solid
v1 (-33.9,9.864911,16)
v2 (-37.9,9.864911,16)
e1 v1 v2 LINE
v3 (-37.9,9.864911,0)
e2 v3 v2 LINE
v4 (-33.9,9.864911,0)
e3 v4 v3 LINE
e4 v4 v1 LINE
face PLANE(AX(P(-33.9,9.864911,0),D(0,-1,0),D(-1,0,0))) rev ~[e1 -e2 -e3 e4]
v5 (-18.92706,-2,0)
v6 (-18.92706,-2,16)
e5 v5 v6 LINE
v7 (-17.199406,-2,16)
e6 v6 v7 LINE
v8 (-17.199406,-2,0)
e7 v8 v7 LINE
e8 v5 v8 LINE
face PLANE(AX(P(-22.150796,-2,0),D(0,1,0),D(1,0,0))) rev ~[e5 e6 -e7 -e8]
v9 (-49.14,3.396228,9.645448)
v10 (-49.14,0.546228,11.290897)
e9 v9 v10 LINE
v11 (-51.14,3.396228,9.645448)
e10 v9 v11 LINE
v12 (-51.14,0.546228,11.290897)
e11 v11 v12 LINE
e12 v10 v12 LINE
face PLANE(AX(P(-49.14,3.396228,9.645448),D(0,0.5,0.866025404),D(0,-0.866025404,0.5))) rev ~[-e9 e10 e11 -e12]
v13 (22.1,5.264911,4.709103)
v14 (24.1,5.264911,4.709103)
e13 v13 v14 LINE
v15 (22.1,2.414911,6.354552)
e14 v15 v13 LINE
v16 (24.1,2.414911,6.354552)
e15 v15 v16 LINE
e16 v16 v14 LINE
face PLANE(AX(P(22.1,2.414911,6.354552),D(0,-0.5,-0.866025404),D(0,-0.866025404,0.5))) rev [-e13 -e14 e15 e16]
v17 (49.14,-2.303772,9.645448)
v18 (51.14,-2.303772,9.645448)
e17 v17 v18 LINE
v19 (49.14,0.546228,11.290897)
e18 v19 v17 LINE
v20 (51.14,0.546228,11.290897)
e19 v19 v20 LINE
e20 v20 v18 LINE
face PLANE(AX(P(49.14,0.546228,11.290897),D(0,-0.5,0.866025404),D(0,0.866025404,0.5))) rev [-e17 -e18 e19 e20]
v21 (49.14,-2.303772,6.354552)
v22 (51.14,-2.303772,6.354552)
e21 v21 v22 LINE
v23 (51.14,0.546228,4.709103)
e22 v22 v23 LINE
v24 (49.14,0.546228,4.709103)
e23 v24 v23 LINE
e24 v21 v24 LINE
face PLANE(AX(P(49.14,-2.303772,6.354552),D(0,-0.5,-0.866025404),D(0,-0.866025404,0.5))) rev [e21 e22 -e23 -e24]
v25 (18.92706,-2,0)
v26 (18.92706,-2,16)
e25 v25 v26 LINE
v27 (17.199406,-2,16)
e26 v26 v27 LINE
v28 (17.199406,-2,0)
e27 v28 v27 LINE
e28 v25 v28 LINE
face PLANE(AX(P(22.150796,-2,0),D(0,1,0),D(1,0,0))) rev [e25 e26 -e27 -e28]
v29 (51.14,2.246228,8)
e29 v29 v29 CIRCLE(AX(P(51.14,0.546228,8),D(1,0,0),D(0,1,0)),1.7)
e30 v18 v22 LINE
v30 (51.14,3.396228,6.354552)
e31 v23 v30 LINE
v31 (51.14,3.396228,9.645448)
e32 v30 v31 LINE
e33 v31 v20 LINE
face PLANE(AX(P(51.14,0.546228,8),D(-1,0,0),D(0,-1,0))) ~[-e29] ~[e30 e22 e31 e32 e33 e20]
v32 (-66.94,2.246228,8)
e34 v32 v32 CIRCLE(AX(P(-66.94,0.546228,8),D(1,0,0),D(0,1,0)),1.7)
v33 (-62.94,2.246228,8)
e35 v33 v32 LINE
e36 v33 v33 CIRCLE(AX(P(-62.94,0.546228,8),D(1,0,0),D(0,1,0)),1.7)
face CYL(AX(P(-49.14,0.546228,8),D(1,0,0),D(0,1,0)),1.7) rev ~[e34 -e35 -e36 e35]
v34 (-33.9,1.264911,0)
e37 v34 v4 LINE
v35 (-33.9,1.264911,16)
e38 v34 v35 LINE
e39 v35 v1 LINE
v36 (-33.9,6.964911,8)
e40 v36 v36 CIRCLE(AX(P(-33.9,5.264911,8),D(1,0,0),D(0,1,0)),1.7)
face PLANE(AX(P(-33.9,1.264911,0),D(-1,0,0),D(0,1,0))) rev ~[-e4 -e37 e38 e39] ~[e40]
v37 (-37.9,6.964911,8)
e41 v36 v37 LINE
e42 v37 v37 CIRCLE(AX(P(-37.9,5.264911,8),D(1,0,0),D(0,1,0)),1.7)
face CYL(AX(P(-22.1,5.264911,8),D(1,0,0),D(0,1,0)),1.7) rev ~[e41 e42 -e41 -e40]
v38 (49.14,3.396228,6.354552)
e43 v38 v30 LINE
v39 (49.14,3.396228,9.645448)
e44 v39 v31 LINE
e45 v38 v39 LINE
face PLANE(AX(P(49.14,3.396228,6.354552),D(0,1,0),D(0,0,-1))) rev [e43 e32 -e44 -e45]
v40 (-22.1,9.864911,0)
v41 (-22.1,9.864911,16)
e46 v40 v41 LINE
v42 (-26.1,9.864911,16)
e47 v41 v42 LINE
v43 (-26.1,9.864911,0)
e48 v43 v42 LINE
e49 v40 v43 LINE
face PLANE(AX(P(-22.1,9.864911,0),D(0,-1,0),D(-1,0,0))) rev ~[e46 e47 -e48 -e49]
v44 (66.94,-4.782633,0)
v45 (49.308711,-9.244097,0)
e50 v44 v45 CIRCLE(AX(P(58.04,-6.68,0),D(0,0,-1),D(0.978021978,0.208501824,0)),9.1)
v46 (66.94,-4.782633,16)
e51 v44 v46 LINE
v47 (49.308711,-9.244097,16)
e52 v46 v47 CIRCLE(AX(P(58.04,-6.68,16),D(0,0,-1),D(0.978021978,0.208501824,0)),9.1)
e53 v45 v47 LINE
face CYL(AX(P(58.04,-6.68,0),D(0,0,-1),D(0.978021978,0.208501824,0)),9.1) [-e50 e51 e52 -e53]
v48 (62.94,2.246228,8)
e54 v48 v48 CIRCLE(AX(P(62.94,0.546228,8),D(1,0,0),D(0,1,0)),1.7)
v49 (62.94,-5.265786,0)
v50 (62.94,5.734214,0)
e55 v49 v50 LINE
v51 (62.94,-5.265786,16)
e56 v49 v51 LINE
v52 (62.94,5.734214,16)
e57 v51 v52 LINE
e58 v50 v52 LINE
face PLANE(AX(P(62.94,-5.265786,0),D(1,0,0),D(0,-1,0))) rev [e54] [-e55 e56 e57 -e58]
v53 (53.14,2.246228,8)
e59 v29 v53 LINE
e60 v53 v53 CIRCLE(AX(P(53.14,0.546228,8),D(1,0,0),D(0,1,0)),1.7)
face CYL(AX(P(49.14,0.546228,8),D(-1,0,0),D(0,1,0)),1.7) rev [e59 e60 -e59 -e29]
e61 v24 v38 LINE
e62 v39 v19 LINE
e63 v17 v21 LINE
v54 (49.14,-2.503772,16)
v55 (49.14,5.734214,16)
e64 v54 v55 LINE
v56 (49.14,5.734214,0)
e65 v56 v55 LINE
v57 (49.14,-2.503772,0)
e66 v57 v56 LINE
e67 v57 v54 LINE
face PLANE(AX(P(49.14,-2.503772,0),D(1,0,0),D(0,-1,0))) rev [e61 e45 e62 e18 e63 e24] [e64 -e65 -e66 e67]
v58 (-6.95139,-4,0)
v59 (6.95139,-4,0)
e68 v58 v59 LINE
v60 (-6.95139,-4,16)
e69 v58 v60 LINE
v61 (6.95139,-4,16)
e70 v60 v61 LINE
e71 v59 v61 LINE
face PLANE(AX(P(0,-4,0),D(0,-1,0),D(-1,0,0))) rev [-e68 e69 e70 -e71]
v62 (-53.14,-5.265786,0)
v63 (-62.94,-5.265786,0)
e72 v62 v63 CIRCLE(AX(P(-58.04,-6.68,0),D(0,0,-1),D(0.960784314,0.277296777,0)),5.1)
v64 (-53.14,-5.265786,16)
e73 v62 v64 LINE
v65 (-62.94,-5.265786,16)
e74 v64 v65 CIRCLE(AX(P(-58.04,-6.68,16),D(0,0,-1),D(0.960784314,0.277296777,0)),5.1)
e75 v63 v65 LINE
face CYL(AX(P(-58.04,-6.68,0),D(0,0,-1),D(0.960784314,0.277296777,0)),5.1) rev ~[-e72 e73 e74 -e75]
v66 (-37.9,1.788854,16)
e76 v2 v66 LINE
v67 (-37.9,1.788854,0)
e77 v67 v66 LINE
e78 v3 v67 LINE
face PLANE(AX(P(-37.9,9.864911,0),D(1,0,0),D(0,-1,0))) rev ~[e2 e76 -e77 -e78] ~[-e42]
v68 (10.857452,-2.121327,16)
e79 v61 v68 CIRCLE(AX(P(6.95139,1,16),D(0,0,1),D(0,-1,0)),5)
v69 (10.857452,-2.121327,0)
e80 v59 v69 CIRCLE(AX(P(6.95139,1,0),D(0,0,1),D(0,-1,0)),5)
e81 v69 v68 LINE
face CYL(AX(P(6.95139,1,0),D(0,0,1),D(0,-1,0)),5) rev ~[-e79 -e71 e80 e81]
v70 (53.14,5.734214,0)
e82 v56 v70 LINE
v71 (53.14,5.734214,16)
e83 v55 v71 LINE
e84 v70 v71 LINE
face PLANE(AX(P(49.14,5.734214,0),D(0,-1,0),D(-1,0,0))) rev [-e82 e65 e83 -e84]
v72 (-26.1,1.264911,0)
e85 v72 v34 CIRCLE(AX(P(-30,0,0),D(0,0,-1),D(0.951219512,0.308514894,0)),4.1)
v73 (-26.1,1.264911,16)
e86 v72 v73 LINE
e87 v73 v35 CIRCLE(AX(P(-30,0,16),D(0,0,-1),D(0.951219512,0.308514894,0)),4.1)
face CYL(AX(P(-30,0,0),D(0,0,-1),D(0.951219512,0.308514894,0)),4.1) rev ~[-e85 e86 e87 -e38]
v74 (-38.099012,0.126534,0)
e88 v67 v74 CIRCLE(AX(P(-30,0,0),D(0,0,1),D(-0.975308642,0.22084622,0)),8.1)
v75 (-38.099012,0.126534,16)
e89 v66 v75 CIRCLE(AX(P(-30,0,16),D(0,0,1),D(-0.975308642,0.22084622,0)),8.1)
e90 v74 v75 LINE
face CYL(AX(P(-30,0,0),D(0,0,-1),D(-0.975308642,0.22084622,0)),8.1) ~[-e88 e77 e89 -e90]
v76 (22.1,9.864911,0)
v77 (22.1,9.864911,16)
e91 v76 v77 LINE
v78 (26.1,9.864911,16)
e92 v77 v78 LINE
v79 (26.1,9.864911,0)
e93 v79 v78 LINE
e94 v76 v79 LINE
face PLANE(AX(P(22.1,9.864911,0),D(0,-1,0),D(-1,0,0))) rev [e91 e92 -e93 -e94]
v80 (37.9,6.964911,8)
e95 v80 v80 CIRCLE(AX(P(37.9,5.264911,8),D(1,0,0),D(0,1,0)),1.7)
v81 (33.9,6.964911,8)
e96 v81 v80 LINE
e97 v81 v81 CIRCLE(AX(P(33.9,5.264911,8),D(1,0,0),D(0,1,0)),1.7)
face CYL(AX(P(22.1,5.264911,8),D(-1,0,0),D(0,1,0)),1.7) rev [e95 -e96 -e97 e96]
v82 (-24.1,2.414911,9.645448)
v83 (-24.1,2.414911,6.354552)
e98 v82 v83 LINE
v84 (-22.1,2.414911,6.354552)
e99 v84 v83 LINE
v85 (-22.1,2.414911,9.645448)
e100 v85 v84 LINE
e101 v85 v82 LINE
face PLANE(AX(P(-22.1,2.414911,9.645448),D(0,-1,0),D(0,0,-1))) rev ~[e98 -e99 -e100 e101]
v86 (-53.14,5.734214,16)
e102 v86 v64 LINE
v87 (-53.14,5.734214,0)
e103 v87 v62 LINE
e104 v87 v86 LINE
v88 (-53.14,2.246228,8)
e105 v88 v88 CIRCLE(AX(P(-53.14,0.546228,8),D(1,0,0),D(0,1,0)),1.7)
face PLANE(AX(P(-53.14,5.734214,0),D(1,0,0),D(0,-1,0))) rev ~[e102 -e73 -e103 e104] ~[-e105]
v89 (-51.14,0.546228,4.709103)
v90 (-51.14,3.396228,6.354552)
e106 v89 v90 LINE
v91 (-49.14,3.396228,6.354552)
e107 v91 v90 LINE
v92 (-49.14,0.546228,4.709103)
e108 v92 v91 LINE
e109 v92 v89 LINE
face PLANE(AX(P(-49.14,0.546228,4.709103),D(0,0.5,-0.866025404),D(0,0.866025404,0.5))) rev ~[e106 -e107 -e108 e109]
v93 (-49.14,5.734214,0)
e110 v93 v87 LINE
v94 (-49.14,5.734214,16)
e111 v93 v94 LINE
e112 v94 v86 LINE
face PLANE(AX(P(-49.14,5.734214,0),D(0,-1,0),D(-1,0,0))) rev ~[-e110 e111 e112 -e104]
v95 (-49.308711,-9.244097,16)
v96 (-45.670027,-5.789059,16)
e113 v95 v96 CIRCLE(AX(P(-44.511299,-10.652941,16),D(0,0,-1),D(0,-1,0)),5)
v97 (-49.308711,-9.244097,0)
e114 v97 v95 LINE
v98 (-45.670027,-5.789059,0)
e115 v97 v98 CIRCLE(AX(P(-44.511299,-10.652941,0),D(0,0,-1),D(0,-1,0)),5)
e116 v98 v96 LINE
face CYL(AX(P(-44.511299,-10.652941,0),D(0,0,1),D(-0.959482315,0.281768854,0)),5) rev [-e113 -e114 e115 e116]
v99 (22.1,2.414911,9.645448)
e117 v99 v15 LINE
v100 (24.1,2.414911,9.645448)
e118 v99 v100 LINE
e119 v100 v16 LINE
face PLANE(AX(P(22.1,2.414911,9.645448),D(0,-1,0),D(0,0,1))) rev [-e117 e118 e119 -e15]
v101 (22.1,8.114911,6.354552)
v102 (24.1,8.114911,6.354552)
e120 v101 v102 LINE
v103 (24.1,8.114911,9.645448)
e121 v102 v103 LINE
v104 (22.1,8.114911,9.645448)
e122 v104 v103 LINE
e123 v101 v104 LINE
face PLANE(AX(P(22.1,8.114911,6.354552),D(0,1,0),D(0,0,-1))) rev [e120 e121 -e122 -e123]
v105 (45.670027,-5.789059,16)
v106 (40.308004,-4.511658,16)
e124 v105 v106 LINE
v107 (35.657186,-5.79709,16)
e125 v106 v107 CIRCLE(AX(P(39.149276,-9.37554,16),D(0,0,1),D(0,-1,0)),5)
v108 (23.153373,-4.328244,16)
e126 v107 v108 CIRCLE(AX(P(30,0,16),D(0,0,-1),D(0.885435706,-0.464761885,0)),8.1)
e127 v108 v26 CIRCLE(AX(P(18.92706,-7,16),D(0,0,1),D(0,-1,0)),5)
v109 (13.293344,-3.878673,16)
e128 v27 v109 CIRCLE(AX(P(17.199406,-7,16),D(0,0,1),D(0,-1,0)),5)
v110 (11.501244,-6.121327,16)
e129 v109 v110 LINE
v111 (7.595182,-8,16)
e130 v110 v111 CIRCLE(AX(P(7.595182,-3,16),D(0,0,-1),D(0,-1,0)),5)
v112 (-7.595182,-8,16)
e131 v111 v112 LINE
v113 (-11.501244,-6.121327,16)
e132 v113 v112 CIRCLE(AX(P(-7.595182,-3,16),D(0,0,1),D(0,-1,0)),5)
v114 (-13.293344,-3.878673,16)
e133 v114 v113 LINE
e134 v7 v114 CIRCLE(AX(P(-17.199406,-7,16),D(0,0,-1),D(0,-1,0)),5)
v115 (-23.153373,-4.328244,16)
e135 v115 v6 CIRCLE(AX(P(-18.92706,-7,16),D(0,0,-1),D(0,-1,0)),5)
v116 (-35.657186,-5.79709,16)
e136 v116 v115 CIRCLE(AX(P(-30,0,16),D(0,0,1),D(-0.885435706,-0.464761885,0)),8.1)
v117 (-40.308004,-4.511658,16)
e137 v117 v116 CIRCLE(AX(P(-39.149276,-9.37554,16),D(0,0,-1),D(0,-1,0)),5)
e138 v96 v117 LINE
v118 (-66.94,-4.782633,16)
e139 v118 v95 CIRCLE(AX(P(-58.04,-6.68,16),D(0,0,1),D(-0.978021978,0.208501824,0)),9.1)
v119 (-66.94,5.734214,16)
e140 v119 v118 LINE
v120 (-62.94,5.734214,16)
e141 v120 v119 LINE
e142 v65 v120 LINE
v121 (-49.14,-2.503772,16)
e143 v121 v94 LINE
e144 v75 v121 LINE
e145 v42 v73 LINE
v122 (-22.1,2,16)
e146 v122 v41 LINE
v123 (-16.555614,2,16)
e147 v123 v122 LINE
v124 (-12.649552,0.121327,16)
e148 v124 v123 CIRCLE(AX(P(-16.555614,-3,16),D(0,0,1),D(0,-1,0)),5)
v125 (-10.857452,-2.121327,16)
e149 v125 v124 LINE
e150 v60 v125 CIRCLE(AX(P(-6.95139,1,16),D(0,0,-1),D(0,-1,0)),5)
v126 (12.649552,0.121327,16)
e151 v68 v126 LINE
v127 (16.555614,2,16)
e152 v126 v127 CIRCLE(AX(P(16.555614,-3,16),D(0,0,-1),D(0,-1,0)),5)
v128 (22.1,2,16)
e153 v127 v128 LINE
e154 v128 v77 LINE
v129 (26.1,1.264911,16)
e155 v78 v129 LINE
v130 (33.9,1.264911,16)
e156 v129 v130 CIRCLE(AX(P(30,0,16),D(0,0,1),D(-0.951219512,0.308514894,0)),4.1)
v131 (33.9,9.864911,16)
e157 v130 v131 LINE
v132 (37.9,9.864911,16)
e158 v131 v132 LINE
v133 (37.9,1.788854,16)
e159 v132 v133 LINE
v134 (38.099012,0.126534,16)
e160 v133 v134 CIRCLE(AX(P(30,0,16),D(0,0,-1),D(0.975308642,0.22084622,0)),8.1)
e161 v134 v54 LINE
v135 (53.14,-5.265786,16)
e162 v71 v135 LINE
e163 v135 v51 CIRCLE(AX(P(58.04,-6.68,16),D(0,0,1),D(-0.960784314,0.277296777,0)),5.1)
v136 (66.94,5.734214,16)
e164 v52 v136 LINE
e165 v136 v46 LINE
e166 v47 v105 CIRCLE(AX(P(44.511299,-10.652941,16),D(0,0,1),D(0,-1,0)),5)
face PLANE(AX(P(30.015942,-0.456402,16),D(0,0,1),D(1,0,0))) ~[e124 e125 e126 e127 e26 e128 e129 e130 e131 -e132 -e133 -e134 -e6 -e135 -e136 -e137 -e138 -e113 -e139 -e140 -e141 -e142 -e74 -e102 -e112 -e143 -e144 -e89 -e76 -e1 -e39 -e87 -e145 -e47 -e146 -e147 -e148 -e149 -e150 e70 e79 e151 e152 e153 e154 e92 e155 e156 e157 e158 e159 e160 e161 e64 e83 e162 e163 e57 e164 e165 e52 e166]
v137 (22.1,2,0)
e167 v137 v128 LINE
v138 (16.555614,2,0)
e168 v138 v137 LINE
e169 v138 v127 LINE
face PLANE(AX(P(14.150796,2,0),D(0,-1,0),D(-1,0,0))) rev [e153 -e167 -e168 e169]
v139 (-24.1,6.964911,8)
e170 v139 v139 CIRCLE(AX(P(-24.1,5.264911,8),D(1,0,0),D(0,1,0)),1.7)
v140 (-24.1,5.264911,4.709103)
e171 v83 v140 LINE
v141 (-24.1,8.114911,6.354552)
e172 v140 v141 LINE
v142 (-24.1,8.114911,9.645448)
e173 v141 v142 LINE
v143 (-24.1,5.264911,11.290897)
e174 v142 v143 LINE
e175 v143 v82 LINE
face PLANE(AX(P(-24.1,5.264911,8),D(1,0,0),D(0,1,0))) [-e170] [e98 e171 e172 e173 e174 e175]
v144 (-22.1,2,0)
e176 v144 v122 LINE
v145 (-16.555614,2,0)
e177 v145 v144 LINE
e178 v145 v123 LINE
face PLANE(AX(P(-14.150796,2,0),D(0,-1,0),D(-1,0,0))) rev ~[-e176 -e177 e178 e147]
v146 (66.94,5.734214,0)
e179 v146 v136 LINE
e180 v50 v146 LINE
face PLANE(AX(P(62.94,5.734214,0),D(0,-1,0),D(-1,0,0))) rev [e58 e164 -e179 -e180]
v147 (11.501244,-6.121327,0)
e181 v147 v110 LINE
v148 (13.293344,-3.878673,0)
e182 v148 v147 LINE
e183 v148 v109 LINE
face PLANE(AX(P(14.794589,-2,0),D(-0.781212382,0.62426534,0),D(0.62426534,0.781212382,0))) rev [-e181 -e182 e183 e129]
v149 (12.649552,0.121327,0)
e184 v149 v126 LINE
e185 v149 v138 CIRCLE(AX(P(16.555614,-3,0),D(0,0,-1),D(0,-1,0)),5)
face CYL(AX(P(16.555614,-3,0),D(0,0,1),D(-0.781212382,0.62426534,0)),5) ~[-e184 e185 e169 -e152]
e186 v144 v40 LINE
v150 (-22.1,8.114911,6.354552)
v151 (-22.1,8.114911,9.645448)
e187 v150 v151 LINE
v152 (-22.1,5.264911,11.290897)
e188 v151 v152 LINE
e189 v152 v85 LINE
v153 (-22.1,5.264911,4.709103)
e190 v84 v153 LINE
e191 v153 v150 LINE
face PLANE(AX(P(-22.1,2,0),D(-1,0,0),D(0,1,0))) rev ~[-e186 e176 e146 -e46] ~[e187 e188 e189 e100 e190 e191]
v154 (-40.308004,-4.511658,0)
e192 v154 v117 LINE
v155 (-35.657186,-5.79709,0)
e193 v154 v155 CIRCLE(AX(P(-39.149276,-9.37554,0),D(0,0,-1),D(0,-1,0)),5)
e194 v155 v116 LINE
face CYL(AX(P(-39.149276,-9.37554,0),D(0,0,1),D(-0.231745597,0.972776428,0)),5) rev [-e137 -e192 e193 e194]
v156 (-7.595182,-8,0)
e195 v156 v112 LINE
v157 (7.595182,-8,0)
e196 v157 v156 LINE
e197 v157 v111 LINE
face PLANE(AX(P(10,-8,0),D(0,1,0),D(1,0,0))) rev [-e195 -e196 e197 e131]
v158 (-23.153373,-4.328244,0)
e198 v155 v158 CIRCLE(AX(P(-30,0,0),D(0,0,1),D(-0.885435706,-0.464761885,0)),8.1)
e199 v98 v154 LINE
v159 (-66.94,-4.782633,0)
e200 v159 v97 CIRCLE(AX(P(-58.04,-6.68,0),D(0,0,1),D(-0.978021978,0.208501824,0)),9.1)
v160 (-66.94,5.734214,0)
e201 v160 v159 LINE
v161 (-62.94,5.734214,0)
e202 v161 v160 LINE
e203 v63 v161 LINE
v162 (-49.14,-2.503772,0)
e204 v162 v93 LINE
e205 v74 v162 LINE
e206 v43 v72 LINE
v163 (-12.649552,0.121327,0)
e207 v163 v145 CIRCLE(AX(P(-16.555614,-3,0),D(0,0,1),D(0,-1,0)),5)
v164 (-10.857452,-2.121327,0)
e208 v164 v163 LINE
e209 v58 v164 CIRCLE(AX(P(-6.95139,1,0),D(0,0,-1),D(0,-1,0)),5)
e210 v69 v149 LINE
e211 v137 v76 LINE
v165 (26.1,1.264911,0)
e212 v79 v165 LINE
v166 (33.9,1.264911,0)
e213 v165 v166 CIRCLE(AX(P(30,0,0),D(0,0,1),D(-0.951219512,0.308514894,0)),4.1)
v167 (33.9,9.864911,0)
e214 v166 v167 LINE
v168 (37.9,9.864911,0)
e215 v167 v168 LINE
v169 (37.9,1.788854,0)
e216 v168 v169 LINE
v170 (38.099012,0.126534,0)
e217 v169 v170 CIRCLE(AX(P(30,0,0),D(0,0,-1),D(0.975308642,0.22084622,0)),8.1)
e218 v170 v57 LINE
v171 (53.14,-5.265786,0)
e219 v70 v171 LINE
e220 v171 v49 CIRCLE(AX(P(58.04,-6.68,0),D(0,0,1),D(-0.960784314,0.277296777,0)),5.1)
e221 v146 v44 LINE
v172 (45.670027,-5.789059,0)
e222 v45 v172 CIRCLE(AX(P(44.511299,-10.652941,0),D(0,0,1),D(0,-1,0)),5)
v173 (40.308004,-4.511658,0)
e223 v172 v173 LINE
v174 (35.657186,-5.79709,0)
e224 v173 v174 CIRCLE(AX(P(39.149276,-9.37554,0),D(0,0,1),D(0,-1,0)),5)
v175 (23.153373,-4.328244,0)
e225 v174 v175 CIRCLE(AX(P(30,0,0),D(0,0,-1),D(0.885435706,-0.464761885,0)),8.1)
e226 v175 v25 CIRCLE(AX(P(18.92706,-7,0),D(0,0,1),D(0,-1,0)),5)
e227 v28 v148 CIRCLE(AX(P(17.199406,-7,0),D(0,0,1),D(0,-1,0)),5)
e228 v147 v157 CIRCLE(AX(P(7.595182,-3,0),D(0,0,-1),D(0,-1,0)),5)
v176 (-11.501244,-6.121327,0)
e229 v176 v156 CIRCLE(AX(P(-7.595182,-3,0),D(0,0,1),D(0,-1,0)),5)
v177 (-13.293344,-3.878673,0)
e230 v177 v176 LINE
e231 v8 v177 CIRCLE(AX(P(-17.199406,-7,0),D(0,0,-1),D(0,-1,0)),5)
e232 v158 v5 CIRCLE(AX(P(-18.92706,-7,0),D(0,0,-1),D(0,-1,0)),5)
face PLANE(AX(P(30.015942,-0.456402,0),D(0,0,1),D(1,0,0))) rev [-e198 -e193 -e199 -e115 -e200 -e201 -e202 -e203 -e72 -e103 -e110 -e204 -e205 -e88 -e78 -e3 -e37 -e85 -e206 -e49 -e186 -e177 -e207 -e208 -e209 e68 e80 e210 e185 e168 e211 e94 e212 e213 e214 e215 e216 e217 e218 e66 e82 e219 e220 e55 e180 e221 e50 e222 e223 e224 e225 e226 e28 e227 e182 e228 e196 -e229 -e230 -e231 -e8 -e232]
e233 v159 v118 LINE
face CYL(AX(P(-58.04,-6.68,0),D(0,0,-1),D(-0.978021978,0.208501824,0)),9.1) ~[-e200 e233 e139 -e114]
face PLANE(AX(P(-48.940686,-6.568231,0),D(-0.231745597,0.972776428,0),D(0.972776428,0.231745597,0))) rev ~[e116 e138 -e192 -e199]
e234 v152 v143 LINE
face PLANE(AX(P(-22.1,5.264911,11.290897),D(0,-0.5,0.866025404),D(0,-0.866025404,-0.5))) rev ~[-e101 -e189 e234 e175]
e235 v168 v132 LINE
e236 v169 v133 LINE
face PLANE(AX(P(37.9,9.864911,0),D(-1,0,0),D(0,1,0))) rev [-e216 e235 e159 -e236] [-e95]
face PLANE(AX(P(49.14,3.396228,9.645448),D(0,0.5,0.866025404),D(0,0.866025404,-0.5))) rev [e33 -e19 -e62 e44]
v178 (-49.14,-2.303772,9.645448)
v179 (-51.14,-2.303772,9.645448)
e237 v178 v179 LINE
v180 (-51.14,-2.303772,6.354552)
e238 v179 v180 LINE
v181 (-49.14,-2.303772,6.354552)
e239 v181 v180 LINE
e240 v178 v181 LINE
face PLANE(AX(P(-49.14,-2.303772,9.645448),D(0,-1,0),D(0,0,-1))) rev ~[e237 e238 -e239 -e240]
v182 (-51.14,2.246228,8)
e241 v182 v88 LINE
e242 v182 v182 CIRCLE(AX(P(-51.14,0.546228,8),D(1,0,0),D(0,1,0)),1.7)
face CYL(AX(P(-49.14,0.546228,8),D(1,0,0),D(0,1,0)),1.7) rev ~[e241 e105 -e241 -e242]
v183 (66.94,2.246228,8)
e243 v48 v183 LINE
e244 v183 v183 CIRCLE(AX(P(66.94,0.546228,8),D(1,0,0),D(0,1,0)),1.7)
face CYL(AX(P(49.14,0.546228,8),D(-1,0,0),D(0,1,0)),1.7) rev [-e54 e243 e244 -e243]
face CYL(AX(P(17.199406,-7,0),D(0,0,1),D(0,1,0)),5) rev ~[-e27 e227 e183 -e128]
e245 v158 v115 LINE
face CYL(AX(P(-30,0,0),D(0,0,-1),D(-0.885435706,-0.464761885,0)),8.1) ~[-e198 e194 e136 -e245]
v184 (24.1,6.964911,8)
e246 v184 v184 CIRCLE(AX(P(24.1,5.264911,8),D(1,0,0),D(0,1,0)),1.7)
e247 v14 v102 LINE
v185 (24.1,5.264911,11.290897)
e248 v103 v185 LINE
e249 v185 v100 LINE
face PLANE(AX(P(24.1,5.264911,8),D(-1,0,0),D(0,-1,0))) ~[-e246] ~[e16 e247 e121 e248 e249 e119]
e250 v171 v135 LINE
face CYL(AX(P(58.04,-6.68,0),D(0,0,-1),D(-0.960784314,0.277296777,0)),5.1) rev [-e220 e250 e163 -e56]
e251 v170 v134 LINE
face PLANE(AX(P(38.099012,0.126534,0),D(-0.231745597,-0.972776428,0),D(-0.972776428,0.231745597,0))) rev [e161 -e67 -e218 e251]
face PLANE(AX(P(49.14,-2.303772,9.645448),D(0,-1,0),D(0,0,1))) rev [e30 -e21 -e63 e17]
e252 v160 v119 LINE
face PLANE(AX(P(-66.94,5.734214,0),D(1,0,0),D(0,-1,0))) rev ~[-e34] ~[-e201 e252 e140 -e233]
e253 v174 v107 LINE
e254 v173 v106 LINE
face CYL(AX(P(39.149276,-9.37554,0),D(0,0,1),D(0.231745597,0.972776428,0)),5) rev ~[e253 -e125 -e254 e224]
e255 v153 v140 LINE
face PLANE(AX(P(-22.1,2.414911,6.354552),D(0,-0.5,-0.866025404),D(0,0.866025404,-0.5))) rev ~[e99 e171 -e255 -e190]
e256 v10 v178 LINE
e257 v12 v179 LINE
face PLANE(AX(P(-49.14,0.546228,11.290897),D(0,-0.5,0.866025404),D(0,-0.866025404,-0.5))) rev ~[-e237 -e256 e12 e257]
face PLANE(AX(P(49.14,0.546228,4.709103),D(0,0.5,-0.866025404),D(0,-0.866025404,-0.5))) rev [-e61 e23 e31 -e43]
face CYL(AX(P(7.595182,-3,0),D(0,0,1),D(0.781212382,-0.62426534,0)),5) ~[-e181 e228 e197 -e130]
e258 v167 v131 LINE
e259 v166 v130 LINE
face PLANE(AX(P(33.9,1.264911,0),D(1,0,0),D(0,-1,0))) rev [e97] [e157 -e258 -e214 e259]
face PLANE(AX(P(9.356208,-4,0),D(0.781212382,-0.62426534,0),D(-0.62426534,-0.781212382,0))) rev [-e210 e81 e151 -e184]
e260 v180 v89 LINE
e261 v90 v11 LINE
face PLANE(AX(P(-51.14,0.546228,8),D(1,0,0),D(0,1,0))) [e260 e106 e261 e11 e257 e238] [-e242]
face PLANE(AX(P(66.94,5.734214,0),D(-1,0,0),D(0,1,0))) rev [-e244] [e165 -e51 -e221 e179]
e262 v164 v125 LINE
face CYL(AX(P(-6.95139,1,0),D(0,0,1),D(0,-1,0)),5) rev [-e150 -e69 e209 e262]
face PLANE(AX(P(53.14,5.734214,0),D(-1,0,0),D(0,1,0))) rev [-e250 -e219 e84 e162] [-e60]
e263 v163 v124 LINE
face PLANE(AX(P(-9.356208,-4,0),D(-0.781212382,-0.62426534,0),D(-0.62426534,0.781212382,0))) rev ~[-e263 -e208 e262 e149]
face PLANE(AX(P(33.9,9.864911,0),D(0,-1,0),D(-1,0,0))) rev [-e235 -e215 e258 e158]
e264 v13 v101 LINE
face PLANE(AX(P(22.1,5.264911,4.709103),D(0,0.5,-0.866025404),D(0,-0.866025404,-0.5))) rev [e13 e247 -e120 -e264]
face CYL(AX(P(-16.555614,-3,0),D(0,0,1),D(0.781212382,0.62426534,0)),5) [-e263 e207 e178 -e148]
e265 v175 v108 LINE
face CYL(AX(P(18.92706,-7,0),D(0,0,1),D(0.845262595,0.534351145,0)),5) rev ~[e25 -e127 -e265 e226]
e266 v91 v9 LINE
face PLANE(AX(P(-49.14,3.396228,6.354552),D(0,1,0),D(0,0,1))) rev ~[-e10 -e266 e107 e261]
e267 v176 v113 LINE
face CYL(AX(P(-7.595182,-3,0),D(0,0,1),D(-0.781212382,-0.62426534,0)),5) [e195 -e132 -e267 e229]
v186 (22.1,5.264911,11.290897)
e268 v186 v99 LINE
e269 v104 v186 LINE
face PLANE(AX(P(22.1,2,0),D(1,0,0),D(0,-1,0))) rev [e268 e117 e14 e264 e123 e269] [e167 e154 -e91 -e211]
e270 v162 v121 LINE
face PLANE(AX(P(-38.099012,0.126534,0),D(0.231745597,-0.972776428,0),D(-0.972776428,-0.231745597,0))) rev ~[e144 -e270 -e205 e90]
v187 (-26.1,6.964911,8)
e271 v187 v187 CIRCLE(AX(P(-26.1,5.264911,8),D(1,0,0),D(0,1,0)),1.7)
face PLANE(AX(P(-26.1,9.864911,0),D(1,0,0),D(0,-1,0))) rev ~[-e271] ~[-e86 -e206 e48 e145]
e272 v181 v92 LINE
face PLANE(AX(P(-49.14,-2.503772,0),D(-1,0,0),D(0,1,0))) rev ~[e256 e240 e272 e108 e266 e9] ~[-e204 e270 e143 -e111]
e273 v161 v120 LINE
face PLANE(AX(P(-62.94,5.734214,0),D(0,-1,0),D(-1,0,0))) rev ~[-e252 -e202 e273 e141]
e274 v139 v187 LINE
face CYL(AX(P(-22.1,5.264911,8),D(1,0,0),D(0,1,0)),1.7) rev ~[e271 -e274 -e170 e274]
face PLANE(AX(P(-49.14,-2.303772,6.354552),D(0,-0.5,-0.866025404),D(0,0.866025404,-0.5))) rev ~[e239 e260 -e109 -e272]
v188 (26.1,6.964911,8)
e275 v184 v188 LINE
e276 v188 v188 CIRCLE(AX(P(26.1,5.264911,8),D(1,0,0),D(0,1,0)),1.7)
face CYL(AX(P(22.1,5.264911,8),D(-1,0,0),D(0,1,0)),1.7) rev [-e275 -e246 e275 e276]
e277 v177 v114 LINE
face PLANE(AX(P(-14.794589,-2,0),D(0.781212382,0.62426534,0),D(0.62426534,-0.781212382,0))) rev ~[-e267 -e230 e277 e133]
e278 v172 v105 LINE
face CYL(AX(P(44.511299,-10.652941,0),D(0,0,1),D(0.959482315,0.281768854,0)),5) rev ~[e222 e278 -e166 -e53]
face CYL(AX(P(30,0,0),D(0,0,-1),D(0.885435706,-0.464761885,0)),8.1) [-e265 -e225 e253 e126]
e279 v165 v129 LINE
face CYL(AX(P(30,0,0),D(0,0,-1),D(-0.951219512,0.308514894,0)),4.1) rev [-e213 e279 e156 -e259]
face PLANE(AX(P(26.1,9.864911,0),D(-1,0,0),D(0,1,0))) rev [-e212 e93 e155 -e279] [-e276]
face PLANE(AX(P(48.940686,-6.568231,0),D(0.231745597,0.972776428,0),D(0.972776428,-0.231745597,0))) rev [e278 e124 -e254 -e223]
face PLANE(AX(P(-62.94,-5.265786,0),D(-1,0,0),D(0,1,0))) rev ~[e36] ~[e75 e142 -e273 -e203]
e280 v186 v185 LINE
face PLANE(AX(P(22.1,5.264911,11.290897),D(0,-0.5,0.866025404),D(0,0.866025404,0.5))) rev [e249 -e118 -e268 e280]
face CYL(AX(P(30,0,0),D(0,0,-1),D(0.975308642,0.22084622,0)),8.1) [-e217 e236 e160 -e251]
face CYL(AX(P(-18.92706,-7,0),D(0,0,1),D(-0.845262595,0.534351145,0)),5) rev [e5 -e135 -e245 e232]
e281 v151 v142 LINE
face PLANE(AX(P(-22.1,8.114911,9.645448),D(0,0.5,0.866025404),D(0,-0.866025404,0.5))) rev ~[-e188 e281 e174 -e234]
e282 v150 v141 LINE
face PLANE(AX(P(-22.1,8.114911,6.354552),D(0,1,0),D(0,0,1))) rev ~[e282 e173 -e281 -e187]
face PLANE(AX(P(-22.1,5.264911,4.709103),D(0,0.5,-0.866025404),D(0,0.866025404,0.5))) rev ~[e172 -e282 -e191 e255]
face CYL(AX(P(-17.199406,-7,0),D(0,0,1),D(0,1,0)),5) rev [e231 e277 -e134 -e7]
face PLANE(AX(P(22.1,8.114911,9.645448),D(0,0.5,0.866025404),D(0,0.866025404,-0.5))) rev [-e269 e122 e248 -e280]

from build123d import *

# Parameters (mm, degrees)
F1_DEPTH = 16
F2_R     = 1.7
F3_DEPTH = 15.8
F4_DEPTH = 2
F5_R     = 1.7
F6_DEPTH = 17.8
F7_DEPTH = 2
F8_R     = 5


# Not quite as in the source:
# - a feature names something its author has since deleted; it is built from what else it names


with BuildPart() as f1:
    # F0 (on Top) → F1 (new body)
    with BuildSketch(Plane.XY):
        with BuildLine():
            ThreePointArc((-26.1, 1.2649110641), (-30, -4.1), (-33.9, 1.2649110641))
            Line((-33.9, 1.2649110641), (-33.9, 7.0992957397))
            ThreePointArc((-33.9, 7.0992957397), (-36.4699456608, 4.8733769756), (-37.9, 1.788854382))
            ThreePointArc((-37.9, 1.788854382), (-38.0425692419, 0.9628499311), (-38.0990116086, 0.1265344399))
            ThreePointArc((-38.0990116086, 0.1265344399), (-37.8794890645, -1.8771393349), (-37.1720292209, -3.7645712709))
            ThreePointArc((-37.1720292209, -3.7645712709), (-29.054976567, -8.0446833817), (-22.1507962187, -2))
            ThreePointArc((-22.1507962187, -2), (-21.9, 0), (-22.1507962187, 2))
            ThreePointArc((-22.1507962187, 2), (-23.5959659875, 4.9596722035), (-26.1, 7.0992957397))
            Line((-26.1, 7.0992957397), (-26.1, 1.2649110641))
        make_face()
        with BuildLine():
            ThreePointArc((-37.9, 1.788854382), (-36.4699456608, 4.8733769756), (-33.9, 7.0992957397))
            Line((-33.9, 7.0992957397), (-33.9, 9.8649110641))
            Line((-33.9, 9.8649110641), (-37.9, 9.8649110641))
            Line((-37.9, 9.8649110641), (-37.9, 1.788854382))
        make_face()
        with BuildLine():
            Line((-26.1, 9.8649110641), (-26.1, 7.0992957397))
            ThreePointArc((-26.1, 7.0992957397), (-23.5959659875, 4.9596722035), (-22.1507962187, 2))
            Line((-22.1507962187, 2), (-22.1, 2))
            Line((-22.1, 2), (-22.1, 9.8649110641))
            Line((-22.1, 9.8649110641), (-26.1, 9.8649110641))
        make_face()
        with BuildLine():
            Line((-22.1, 2), (-22.1507962187, 2))
            ThreePointArc((-22.1507962187, 2), (-21.9, 0), (-22.1507962187, -2))
            Line((-22.1507962187, -2), (-16.1507962187, -2))
            Line((-16.1507962187, -2), (-14.7945886775, -2))
            Line((-14.7945886775, -2), (-10, -8))
            Line((-10, -8), (0, -8))
            Line((0, -8), (0, -4))
            Line((0, -4), (-6, -4))
            Line((-6, -4), (-9.3562075412, -4))
            Line((-9.3562075412, -4), (-14.1507962187, 2))
            Line((-14.1507962187, 2), (-22.1, 2))
        make_face()
        with BuildLine():
            ThreePointArc((-37.1720292209, -3.7645712709), (-37.8794890645, -1.8771393349), (-38.0990116086, 0.1265344399))
            Line((-38.0990116086, 0.1265344399), (-49.14, -2.5037723523))
            Line((-49.14, -2.5037723523), (-49.14, -4.7826334039))
            ThreePointArc((-49.14, -4.7826334039), (-48.9961671585, -5.6705013446), (-48.9406864116, -6.5682314005))
            Line((-48.9406864116, -6.5682314005), (-37.1720292209, -3.7645712709))
        make_face()
        with BuildLine():
            Line((-49.14, -4.7826334039), (-49.14, -2.5037723523))
            Line((-49.14, -2.5037723523), (-49.8676687992, -2.6771256897))
            ThreePointArc((-49.8676687992, -2.6771256897), (-49.4391620268, -3.7075286109), (-49.14, -4.7826334039))
        make_face()
        with BuildLine():
            Line((-49.8676687992, -2.6771256897), (-49.14, -2.5037723523))
            Line((-49.14, -2.5037723523), (-49.14, 5.7342135624))
            Line((-49.14, 5.7342135624), (-53.14, 5.7342135624))
            Line((-53.14, 5.7342135624), (-53.14, 0.9881158051))
            ThreePointArc((-53.14, 0.9881158051), (-51.2517778793, -0.6194686338), (-49.8676687992, -2.6771256897))
        make_face()
        with BuildLine():
            ThreePointArc((-66.94, -4.7826334039), (-58.9383437694, -15.7355495952), (-48.9406864116, -6.5682314005))
            ThreePointArc((-48.9406864116, -6.5682314005), (-48.9961671585, -5.6705013446), (-49.14, -4.7826334039))
            ThreePointArc((-49.14, -4.7826334039), (-49.4391620268, -3.7075286109), (-49.8676687992, -2.6771256897))
            ThreePointArc((-49.8676687992, -2.6771256897), (-51.2517778793, -0.6194686338), (-53.14, 0.9881158051))
            Line((-53.14, 0.9881158051), (-53.14, -5.2657864376))
            ThreePointArc((-53.14, -5.2657864376), (-58.04, -11.78), (-62.94, -5.2657864376))
            Line((-62.94, -5.2657864376), (-62.94, 0.9881158051))
            ThreePointArc((-62.94, 0.9881158051), (-65.5189963637, -1.4959269496), (-66.94, -4.7826334039))
        make_face()
        with BuildLine():
            Line((-66.94, 5.7342135624), (-66.94, -4.7826334039))
            ThreePointArc((-66.94, -4.7826334039), (-65.5189963637, -1.4959269496), (-62.94, 0.9881158051))
            Line((-62.94, 0.9881158051), (-62.94, 5.7342135624))
            Line((-62.94, 5.7342135624), (-66.94, 5.7342135624))
        make_face()
    extrude(amount=F1_DEPTH)

    # F2 (on face) → F3 (cut, through all)
    with BuildSketch(Plane.YZ.offset(-22.1)):
        with Locations((5.2649110641, 8)):
            Circle(F2_R)
    extrude(amount=-F3_DEPTH, mode=Mode.SUBTRACT)

    # F2 (on face) → F4 (cut)
    with BuildSketch(Plane.YZ.offset(-22.1)):
        Polygon((8.1149110641, 6.3545517328), (8.1149110641, 9.6454482672), (5.2649110641, 11.2908965344), (2.4149110641, 9.6454482672), (2.4149110641, 6.3545517328), (5.2649110641, 4.7091034656), align=None)
        with Locations((5.2649110641, 8)):
            Circle(F2_R, mode=Mode.SUBTRACT)
    extrude(amount=-F4_DEPTH, mode=Mode.SUBTRACT)

    # F5 (on face) → F6 (cut, through all)
    with BuildSketch(Plane.YZ.offset(-49.14)):
        with Locations((0.5462276477, 8)):
            Circle(F5_R)
    extrude(amount=-F6_DEPTH, mode=Mode.SUBTRACT)

    # F5 (on face) → F7 (cut)
    with BuildSketch(Plane.YZ.offset(-49.14)):
        Polygon((3.3962276477, 6.3545517328), (3.3962276477, 9.6454482672), (0.5462276477, 11.2908965344), (-2.3037723523, 9.6454482672), (-2.3037723523, 6.3545517328), (0.5462276477, 4.7091034656), align=None)
        with Locations((0.5462276477, 8)):
            Circle(F5_R, mode=Mode.SUBTRACT)
    extrude(amount=-F7_DEPTH, mode=Mode.SUBTRACT)

    # F8
    f8_edges = [f1.edges().sort_by_distance(p)[0] for p in [
        (-48.940686, -6.568231, 8),
        (-37.172029, -3.764571, 8),
        (-22.150796, -2, 8),
        (-14.794589, -2, 8),
        (-10, -8, 8),
        (-9.356208, -4, 8),
        (-14.150796, 2, 8),
    ]]
    fillet(f8_edges, radius=F8_R)

    # F9: F1 across plane


with BuildPart() as f1_1:
    add(f1.part)
    add(f1.part.mirror(Plane.YZ))


solid = f1_1.part
